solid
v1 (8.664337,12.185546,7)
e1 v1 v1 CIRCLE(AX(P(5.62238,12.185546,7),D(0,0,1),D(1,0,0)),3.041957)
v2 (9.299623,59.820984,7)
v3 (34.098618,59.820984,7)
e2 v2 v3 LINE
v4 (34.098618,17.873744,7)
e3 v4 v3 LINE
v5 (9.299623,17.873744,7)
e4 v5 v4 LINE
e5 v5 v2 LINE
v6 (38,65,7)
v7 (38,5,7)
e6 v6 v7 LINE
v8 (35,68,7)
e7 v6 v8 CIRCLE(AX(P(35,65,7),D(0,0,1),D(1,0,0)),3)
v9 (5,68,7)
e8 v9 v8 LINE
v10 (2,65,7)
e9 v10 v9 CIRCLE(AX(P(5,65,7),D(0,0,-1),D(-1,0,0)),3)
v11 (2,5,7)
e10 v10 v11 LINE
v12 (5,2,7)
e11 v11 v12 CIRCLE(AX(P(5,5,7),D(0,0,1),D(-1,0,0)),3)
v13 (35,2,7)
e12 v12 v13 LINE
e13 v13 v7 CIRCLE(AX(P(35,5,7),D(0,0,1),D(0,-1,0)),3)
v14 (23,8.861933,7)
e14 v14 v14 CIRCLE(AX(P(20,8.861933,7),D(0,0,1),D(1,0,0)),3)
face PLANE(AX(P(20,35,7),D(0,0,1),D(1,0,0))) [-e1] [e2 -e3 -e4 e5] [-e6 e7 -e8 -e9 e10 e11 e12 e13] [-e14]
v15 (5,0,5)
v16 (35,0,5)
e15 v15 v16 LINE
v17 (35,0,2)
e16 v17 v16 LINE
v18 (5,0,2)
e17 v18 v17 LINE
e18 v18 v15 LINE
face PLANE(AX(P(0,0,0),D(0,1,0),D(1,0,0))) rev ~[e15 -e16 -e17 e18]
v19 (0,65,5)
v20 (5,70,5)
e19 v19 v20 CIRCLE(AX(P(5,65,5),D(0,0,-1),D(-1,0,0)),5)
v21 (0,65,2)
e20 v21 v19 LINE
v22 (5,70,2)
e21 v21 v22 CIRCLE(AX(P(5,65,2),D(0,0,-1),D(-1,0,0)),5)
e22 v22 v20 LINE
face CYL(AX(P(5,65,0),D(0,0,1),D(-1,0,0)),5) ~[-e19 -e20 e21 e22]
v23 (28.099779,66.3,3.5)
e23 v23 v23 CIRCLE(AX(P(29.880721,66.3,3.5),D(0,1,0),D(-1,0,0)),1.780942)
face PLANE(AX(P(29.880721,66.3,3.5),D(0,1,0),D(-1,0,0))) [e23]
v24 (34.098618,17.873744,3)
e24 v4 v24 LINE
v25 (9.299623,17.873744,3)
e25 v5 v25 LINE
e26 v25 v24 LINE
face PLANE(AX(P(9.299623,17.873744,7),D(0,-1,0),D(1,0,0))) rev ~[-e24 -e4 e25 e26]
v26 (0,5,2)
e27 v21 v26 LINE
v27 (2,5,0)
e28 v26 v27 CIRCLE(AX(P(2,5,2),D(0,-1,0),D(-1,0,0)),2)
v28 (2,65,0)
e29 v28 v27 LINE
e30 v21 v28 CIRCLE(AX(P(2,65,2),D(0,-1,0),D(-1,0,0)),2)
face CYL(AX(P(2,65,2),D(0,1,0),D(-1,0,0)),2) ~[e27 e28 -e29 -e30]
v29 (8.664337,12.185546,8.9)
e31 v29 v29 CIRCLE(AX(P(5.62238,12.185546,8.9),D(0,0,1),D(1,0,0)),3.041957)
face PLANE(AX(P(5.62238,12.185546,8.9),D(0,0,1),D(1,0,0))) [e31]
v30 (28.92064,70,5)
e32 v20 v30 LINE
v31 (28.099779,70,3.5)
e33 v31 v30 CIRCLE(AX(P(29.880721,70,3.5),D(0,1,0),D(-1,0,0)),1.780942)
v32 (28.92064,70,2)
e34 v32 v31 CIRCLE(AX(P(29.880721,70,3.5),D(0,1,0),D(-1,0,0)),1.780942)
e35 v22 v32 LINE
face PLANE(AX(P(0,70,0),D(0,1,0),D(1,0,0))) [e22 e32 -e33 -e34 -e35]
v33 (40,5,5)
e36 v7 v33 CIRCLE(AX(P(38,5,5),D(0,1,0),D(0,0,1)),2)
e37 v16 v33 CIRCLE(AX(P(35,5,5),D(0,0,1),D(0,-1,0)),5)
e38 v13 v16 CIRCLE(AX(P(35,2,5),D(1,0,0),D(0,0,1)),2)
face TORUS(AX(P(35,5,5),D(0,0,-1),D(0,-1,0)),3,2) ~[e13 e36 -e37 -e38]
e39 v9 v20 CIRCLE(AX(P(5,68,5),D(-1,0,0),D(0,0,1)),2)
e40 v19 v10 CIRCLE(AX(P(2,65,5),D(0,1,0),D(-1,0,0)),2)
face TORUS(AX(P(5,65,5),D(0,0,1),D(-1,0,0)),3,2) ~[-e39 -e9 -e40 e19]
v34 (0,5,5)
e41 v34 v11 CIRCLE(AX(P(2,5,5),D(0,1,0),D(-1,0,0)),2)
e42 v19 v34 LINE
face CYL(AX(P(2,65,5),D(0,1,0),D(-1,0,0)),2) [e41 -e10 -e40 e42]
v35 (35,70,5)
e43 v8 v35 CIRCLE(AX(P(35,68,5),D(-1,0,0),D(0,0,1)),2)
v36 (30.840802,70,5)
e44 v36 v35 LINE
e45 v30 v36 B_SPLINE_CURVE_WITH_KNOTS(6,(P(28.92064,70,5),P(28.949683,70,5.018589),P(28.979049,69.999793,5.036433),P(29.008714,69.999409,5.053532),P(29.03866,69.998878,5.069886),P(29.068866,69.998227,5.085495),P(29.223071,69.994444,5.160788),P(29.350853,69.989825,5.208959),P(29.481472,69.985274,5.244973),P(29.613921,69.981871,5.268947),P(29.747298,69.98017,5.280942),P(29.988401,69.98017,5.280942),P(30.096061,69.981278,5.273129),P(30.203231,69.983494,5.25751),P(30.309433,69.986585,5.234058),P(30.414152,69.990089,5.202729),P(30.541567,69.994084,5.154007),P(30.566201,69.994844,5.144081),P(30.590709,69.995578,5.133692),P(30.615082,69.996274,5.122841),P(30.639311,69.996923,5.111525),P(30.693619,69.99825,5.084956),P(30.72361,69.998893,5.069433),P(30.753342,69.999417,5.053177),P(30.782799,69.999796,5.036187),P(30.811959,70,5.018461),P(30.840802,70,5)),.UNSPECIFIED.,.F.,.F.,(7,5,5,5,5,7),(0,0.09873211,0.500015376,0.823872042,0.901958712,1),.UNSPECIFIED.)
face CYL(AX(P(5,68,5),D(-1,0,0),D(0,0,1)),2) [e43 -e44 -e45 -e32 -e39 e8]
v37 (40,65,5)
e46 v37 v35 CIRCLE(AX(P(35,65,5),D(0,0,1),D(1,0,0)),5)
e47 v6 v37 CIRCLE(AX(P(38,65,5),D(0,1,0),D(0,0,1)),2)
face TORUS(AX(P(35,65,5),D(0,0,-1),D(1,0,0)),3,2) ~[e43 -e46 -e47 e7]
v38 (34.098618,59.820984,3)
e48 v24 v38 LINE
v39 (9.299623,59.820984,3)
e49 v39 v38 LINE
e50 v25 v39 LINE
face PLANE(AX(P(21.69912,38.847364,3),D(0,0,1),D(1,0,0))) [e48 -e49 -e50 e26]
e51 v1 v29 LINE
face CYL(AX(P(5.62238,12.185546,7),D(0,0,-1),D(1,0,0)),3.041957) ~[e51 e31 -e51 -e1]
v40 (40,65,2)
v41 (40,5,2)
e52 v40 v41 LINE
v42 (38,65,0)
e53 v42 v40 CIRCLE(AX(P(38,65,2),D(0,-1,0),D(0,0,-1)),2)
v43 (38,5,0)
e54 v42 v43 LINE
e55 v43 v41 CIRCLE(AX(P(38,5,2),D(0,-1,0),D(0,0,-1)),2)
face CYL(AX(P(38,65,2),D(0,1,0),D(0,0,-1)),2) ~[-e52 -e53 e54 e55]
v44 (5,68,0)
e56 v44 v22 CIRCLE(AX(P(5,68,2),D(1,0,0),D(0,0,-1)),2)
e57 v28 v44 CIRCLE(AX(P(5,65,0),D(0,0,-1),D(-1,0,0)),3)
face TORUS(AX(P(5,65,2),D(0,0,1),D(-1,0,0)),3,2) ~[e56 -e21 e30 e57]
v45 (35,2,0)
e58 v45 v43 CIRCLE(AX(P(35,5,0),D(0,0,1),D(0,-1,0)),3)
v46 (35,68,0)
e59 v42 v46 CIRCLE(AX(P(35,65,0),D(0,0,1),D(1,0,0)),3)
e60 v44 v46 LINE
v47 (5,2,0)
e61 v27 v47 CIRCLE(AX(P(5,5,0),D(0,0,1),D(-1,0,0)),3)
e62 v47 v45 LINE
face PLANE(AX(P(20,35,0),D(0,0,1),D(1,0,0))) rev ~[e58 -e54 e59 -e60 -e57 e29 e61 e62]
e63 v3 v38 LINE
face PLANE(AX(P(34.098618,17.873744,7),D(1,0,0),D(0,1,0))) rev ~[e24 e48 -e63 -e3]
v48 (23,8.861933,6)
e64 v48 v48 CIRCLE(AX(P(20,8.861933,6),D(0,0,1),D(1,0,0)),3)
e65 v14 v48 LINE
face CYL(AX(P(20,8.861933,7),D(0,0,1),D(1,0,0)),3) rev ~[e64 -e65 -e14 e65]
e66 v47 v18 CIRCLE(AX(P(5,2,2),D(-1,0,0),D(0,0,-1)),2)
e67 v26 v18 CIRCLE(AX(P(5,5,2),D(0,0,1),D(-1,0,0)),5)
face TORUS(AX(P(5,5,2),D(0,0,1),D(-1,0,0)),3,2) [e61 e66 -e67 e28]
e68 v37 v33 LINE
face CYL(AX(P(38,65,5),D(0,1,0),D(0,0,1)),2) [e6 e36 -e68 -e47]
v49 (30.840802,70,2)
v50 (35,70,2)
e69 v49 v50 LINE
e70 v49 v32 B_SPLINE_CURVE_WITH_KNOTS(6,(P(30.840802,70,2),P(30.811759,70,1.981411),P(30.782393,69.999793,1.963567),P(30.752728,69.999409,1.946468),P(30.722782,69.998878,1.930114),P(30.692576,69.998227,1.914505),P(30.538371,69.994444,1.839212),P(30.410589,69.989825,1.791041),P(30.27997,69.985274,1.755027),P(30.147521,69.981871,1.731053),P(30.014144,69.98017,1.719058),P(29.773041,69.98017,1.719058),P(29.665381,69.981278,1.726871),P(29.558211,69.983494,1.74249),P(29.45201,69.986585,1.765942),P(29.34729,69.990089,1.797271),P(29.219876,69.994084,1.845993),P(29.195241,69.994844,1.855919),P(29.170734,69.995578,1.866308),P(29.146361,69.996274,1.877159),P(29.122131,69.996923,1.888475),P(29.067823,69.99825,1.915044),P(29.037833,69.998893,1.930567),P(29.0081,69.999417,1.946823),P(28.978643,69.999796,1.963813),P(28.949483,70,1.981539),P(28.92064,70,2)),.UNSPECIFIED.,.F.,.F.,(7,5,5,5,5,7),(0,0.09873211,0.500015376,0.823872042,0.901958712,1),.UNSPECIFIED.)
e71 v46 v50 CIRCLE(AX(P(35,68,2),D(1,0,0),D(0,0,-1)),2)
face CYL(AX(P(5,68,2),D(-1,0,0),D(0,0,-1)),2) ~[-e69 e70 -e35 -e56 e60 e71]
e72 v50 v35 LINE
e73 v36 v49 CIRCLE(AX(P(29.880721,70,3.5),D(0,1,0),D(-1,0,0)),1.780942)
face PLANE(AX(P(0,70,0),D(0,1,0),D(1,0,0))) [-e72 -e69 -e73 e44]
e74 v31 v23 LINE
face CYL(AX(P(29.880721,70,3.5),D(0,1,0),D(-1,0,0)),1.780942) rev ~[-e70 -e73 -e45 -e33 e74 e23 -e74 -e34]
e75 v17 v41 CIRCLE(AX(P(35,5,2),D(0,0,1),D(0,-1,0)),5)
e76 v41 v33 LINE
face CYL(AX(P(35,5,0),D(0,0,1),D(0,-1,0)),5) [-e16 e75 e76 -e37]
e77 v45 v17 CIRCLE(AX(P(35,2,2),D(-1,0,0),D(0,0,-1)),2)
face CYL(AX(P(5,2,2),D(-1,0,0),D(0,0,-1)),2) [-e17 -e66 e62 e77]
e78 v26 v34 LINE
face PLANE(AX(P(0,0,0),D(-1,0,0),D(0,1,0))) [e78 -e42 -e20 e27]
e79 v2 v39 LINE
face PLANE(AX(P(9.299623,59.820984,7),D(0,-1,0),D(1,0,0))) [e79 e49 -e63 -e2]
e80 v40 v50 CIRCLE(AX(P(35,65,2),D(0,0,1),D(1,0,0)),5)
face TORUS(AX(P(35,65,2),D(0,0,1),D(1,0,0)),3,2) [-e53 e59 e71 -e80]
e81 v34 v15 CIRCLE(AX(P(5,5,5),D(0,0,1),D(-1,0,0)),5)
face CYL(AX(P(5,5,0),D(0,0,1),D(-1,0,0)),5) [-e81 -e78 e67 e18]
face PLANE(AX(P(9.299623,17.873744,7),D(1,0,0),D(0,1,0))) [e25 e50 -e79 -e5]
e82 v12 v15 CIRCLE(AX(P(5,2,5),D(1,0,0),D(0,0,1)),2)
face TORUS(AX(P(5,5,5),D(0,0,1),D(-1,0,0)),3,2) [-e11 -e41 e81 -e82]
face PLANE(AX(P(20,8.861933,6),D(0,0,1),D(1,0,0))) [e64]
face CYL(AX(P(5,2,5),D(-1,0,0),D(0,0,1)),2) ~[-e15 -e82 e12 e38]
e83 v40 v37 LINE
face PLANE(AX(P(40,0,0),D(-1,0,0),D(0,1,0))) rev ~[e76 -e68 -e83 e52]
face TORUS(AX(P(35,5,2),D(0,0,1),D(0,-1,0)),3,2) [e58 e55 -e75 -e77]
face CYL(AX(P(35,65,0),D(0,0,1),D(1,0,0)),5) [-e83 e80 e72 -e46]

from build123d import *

# Parameters (mm, degrees)
F0_W         = 40
F0_H         = 70
F1_DEPTH     = 7
F2_R         = 5
F3_R         = 1.780942195
F4_DEPTH     = 3.7
F5_T1_DEPTH  = 60
F5_T3_DEPTH  = 30
F5_T6_ANGLE  = 90
F5_T8_ANGLE  = 90
F5_T10_ANGLE = 90
F5_T12_ANGLE = 90
F5_T14_ANGLE = 90
F5_T16_ANGLE = 90
F5_T18_ANGLE = 90
F5_T20_ANGLE = 90
F6_R         = 3
F7_DEPTH     = 1
F8_W         = 24.7989948839
F8_H         = 41.9472400099
F9_DEPTH     = 4
F10_R        = 3.0419567341
F11_DEPTH    = 1.9


# Not quite as in the source:
# - a fillet or chamfer that OpenCascade refuses, or shapes differently, is made with other operations: its cross-section is extruded or revolved along the edge and cut away or added


with BuildPart() as f1:
    # F0 (on Top) → F1 (new body)
    with BuildSketch(Plane.XY):
        with Locations((20, 35)):
            Rectangle(F0_W, F0_H)
    extrude(amount=F1_DEPTH)

    # F2
    f2_edges = [f1.edges().sort_by_distance(p)[0] for p in [
        (0, 0, 3.5),
        (40, 0, 3.5),
        (40, 70, 3.5),
        (0, 70, 3.5),
    ]]
    fillet(f2_edges, radius=F2_R)

    # F3 (on face) → F4 (cut)
    with BuildSketch(Plane(origin=(0, 70, 0), x_dir=(-1, 0, 0), z_dir=(0, 1, 0))):
        with Locations((-29.880721122, 3.5)):
            Circle(F3_R)
    extrude(amount=-F4_DEPTH, mode=Mode.SUBTRACT)

    # F5: fillet of radius 2 on 16 edges, made by hand

    # F5_s2 → F5_t1 (cut)
    with BuildSketch(Plane.XZ.offset(-65)):
        with BuildLine():
            ThreePointArc((38, 0), (39.4142135624, 0.5857864376), (40, 2))
            Line((40, 2), (40, 0))
            Line((40, 0), (38, 0))
        make_face()
        with BuildLine():
            ThreePointArc((38, 7), (39.4142135624, 6.4142135624), (40, 5))
            Line((40, 5), (40, 7))
            Line((40, 7), (38, 7))
        make_face()
        with BuildLine():
            ThreePointArc((0, 2), (0.5857864376, 0.5857864376), (2, 0))
            Line((2, 0), (0, 0))
            Line((0, 0), (0, 2))
        make_face()
        with BuildLine():
            ThreePointArc((0, 5), (0.5857864376, 6.4142135624), (2, 7))
            Line((2, 7), (0, 7))
            Line((0, 7), (0, 5))
        make_face()
    extrude(amount=F5_T1_DEPTH, mode=Mode.SUBTRACT)

    # F5_s4 → F5_t3 (cut)
    with BuildSketch(Plane.YZ.offset(5)):
        with BuildLine():
            ThreePointArc((68, 0), (69.4142135624, 0.5857864376), (70, 2))
            Line((70, 2), (70, 0))
            Line((70, 0), (68, 0))
        make_face()
        with BuildLine():
            ThreePointArc((2, 0), (0.5857864376, 0.5857864376), (0, 2))
            Line((0, 2), (0, 0))
            Line((0, 0), (2, 0))
        make_face()
        with BuildLine():
            ThreePointArc((68, 7), (69.4142135624, 6.4142135624), (70, 5))
            Line((70, 5), (70, 7))
            Line((70, 7), (68, 7))
        make_face()
        with BuildLine():
            ThreePointArc((2, 7), (0.5857864376, 6.4142135624), (0, 5))
            Line((0, 5), (0, 7))
            Line((0, 7), (2, 7))
        make_face()
    extrude(amount=F5_T3_DEPTH, mode=Mode.SUBTRACT)

    # F5_s5 → F5_t6 (revolve, cut)
    with BuildSketch(Plane.XZ.offset(-65)):
        with BuildLine():
            ThreePointArc((2, 0), (0.5857864376, 0.5857864376), (0, 2))
            Line((0, 2), (0, 0))
            Line((0, 0), (2, 0))
        make_face()
    revolve(axis=Axis((5, 65, 0), (0, 0, -1)), revolution_arc=F5_T6_ANGLE, mode=Mode.SUBTRACT)

    # F5_s7 → F5_t8 (revolve, cut)
    with BuildSketch(Plane.XZ.offset(-5)):
        with BuildLine():
            ThreePointArc((2, 0), (0.5857864376, 0.5857864376), (0, 2))
            Line((0, 2), (0, 0))
            Line((0, 0), (2, 0))
        make_face()
    revolve(axis=Axis((5, 5, 0), (0, 0, 1)), revolution_arc=F5_T8_ANGLE, mode=Mode.SUBTRACT)

    # F5_s9 → F5_t10 (revolve, cut)
    with BuildSketch(Plane.XZ.offset(-65)):
        with BuildLine():
            ThreePointArc((38, 0), (39.4142135624, 0.5857864376), (40, 2))
            Line((40, 2), (40, 0))
            Line((40, 0), (38, 0))
        make_face()
    revolve(axis=Axis((35, 65, 0), (0, 0, 1)), revolution_arc=F5_T10_ANGLE, mode=Mode.SUBTRACT)

    # F5_s11 → F5_t12 (revolve, cut)
    with BuildSketch(Plane.YZ.offset(35)):
        with BuildLine():
            ThreePointArc((2, 0), (0.5857864376, 0.5857864376), (0, 2))
            Line((0, 2), (0, 0))
            Line((0, 0), (2, 0))
        make_face()
    revolve(axis=Axis((35, 5, 0), (0, 0, 1)), revolution_arc=F5_T12_ANGLE, mode=Mode.SUBTRACT)

    # F5_s13 → F5_t14 (revolve, cut)
    with BuildSketch(Plane.XZ.offset(-65)):
        with BuildLine():
            ThreePointArc((0, 5), (0.5857864376, 6.4142135624), (2, 7))
            Line((2, 7), (0, 7))
            Line((0, 7), (0, 5))
        make_face()
    revolve(axis=Axis((5, 65, 7), (0, 0, -1)), revolution_arc=F5_T14_ANGLE, mode=Mode.SUBTRACT)

    # F5_s15 → F5_t16 (revolve, cut)
    with BuildSketch(Plane.XZ.offset(-5)):
        with BuildLine():
            ThreePointArc((0, 5), (0.5857864376, 6.4142135624), (2, 7))
            Line((2, 7), (0, 7))
            Line((0, 7), (0, 5))
        make_face()
    revolve(axis=Axis((5, 5, 7), (0, 0, 1)), revolution_arc=F5_T16_ANGLE, mode=Mode.SUBTRACT)

    # F5_s17 → F5_t18 (revolve, cut)
    with BuildSketch(Plane.XZ.offset(-65)):
        with BuildLine():
            ThreePointArc((38, 7), (39.4142135624, 6.4142135624), (40, 5))
            Line((40, 5), (40, 7))
            Line((40, 7), (38, 7))
        make_face()
    revolve(axis=Axis((35, 65, 7), (0, 0, 1)), revolution_arc=F5_T18_ANGLE, mode=Mode.SUBTRACT)

    # F5_s19 → F5_t20 (revolve, cut)
    with BuildSketch(Plane.YZ.offset(35)):
        with BuildLine():
            ThreePointArc((2, 7), (0.5857864376, 6.4142135624), (0, 5))
            Line((0, 5), (0, 7))
            Line((0, 7), (2, 7))
        make_face()
    revolve(axis=Axis((35, 5, 7), (0, 0, 1)), revolution_arc=F5_T20_ANGLE, mode=Mode.SUBTRACT)

    # F6 (on face) → F7 (cut)
    with BuildSketch(Plane.XY.offset(7)):
        with Locations((20, 8.8619329035)):
            Circle(F6_R)
    extrude(amount=-F7_DEPTH, mode=Mode.SUBTRACT)

    # F8 (on face) → F9 (cut)
    with BuildSketch(Plane.XY.offset(7)):
        with Locations((21.6991202906, 38.8473635539)):
            Rectangle(F8_W, F8_H)
    extrude(amount=-F9_DEPTH, mode=Mode.SUBTRACT)

    # F10 (on face) → F11 (join)
    with BuildSketch(Plane.XY.offset(7)):
        with Locations((5.6223799475, 12.1855456382)):
            Circle(F10_R)
    extrude(amount=F11_DEPTH)


solid = f1.part
